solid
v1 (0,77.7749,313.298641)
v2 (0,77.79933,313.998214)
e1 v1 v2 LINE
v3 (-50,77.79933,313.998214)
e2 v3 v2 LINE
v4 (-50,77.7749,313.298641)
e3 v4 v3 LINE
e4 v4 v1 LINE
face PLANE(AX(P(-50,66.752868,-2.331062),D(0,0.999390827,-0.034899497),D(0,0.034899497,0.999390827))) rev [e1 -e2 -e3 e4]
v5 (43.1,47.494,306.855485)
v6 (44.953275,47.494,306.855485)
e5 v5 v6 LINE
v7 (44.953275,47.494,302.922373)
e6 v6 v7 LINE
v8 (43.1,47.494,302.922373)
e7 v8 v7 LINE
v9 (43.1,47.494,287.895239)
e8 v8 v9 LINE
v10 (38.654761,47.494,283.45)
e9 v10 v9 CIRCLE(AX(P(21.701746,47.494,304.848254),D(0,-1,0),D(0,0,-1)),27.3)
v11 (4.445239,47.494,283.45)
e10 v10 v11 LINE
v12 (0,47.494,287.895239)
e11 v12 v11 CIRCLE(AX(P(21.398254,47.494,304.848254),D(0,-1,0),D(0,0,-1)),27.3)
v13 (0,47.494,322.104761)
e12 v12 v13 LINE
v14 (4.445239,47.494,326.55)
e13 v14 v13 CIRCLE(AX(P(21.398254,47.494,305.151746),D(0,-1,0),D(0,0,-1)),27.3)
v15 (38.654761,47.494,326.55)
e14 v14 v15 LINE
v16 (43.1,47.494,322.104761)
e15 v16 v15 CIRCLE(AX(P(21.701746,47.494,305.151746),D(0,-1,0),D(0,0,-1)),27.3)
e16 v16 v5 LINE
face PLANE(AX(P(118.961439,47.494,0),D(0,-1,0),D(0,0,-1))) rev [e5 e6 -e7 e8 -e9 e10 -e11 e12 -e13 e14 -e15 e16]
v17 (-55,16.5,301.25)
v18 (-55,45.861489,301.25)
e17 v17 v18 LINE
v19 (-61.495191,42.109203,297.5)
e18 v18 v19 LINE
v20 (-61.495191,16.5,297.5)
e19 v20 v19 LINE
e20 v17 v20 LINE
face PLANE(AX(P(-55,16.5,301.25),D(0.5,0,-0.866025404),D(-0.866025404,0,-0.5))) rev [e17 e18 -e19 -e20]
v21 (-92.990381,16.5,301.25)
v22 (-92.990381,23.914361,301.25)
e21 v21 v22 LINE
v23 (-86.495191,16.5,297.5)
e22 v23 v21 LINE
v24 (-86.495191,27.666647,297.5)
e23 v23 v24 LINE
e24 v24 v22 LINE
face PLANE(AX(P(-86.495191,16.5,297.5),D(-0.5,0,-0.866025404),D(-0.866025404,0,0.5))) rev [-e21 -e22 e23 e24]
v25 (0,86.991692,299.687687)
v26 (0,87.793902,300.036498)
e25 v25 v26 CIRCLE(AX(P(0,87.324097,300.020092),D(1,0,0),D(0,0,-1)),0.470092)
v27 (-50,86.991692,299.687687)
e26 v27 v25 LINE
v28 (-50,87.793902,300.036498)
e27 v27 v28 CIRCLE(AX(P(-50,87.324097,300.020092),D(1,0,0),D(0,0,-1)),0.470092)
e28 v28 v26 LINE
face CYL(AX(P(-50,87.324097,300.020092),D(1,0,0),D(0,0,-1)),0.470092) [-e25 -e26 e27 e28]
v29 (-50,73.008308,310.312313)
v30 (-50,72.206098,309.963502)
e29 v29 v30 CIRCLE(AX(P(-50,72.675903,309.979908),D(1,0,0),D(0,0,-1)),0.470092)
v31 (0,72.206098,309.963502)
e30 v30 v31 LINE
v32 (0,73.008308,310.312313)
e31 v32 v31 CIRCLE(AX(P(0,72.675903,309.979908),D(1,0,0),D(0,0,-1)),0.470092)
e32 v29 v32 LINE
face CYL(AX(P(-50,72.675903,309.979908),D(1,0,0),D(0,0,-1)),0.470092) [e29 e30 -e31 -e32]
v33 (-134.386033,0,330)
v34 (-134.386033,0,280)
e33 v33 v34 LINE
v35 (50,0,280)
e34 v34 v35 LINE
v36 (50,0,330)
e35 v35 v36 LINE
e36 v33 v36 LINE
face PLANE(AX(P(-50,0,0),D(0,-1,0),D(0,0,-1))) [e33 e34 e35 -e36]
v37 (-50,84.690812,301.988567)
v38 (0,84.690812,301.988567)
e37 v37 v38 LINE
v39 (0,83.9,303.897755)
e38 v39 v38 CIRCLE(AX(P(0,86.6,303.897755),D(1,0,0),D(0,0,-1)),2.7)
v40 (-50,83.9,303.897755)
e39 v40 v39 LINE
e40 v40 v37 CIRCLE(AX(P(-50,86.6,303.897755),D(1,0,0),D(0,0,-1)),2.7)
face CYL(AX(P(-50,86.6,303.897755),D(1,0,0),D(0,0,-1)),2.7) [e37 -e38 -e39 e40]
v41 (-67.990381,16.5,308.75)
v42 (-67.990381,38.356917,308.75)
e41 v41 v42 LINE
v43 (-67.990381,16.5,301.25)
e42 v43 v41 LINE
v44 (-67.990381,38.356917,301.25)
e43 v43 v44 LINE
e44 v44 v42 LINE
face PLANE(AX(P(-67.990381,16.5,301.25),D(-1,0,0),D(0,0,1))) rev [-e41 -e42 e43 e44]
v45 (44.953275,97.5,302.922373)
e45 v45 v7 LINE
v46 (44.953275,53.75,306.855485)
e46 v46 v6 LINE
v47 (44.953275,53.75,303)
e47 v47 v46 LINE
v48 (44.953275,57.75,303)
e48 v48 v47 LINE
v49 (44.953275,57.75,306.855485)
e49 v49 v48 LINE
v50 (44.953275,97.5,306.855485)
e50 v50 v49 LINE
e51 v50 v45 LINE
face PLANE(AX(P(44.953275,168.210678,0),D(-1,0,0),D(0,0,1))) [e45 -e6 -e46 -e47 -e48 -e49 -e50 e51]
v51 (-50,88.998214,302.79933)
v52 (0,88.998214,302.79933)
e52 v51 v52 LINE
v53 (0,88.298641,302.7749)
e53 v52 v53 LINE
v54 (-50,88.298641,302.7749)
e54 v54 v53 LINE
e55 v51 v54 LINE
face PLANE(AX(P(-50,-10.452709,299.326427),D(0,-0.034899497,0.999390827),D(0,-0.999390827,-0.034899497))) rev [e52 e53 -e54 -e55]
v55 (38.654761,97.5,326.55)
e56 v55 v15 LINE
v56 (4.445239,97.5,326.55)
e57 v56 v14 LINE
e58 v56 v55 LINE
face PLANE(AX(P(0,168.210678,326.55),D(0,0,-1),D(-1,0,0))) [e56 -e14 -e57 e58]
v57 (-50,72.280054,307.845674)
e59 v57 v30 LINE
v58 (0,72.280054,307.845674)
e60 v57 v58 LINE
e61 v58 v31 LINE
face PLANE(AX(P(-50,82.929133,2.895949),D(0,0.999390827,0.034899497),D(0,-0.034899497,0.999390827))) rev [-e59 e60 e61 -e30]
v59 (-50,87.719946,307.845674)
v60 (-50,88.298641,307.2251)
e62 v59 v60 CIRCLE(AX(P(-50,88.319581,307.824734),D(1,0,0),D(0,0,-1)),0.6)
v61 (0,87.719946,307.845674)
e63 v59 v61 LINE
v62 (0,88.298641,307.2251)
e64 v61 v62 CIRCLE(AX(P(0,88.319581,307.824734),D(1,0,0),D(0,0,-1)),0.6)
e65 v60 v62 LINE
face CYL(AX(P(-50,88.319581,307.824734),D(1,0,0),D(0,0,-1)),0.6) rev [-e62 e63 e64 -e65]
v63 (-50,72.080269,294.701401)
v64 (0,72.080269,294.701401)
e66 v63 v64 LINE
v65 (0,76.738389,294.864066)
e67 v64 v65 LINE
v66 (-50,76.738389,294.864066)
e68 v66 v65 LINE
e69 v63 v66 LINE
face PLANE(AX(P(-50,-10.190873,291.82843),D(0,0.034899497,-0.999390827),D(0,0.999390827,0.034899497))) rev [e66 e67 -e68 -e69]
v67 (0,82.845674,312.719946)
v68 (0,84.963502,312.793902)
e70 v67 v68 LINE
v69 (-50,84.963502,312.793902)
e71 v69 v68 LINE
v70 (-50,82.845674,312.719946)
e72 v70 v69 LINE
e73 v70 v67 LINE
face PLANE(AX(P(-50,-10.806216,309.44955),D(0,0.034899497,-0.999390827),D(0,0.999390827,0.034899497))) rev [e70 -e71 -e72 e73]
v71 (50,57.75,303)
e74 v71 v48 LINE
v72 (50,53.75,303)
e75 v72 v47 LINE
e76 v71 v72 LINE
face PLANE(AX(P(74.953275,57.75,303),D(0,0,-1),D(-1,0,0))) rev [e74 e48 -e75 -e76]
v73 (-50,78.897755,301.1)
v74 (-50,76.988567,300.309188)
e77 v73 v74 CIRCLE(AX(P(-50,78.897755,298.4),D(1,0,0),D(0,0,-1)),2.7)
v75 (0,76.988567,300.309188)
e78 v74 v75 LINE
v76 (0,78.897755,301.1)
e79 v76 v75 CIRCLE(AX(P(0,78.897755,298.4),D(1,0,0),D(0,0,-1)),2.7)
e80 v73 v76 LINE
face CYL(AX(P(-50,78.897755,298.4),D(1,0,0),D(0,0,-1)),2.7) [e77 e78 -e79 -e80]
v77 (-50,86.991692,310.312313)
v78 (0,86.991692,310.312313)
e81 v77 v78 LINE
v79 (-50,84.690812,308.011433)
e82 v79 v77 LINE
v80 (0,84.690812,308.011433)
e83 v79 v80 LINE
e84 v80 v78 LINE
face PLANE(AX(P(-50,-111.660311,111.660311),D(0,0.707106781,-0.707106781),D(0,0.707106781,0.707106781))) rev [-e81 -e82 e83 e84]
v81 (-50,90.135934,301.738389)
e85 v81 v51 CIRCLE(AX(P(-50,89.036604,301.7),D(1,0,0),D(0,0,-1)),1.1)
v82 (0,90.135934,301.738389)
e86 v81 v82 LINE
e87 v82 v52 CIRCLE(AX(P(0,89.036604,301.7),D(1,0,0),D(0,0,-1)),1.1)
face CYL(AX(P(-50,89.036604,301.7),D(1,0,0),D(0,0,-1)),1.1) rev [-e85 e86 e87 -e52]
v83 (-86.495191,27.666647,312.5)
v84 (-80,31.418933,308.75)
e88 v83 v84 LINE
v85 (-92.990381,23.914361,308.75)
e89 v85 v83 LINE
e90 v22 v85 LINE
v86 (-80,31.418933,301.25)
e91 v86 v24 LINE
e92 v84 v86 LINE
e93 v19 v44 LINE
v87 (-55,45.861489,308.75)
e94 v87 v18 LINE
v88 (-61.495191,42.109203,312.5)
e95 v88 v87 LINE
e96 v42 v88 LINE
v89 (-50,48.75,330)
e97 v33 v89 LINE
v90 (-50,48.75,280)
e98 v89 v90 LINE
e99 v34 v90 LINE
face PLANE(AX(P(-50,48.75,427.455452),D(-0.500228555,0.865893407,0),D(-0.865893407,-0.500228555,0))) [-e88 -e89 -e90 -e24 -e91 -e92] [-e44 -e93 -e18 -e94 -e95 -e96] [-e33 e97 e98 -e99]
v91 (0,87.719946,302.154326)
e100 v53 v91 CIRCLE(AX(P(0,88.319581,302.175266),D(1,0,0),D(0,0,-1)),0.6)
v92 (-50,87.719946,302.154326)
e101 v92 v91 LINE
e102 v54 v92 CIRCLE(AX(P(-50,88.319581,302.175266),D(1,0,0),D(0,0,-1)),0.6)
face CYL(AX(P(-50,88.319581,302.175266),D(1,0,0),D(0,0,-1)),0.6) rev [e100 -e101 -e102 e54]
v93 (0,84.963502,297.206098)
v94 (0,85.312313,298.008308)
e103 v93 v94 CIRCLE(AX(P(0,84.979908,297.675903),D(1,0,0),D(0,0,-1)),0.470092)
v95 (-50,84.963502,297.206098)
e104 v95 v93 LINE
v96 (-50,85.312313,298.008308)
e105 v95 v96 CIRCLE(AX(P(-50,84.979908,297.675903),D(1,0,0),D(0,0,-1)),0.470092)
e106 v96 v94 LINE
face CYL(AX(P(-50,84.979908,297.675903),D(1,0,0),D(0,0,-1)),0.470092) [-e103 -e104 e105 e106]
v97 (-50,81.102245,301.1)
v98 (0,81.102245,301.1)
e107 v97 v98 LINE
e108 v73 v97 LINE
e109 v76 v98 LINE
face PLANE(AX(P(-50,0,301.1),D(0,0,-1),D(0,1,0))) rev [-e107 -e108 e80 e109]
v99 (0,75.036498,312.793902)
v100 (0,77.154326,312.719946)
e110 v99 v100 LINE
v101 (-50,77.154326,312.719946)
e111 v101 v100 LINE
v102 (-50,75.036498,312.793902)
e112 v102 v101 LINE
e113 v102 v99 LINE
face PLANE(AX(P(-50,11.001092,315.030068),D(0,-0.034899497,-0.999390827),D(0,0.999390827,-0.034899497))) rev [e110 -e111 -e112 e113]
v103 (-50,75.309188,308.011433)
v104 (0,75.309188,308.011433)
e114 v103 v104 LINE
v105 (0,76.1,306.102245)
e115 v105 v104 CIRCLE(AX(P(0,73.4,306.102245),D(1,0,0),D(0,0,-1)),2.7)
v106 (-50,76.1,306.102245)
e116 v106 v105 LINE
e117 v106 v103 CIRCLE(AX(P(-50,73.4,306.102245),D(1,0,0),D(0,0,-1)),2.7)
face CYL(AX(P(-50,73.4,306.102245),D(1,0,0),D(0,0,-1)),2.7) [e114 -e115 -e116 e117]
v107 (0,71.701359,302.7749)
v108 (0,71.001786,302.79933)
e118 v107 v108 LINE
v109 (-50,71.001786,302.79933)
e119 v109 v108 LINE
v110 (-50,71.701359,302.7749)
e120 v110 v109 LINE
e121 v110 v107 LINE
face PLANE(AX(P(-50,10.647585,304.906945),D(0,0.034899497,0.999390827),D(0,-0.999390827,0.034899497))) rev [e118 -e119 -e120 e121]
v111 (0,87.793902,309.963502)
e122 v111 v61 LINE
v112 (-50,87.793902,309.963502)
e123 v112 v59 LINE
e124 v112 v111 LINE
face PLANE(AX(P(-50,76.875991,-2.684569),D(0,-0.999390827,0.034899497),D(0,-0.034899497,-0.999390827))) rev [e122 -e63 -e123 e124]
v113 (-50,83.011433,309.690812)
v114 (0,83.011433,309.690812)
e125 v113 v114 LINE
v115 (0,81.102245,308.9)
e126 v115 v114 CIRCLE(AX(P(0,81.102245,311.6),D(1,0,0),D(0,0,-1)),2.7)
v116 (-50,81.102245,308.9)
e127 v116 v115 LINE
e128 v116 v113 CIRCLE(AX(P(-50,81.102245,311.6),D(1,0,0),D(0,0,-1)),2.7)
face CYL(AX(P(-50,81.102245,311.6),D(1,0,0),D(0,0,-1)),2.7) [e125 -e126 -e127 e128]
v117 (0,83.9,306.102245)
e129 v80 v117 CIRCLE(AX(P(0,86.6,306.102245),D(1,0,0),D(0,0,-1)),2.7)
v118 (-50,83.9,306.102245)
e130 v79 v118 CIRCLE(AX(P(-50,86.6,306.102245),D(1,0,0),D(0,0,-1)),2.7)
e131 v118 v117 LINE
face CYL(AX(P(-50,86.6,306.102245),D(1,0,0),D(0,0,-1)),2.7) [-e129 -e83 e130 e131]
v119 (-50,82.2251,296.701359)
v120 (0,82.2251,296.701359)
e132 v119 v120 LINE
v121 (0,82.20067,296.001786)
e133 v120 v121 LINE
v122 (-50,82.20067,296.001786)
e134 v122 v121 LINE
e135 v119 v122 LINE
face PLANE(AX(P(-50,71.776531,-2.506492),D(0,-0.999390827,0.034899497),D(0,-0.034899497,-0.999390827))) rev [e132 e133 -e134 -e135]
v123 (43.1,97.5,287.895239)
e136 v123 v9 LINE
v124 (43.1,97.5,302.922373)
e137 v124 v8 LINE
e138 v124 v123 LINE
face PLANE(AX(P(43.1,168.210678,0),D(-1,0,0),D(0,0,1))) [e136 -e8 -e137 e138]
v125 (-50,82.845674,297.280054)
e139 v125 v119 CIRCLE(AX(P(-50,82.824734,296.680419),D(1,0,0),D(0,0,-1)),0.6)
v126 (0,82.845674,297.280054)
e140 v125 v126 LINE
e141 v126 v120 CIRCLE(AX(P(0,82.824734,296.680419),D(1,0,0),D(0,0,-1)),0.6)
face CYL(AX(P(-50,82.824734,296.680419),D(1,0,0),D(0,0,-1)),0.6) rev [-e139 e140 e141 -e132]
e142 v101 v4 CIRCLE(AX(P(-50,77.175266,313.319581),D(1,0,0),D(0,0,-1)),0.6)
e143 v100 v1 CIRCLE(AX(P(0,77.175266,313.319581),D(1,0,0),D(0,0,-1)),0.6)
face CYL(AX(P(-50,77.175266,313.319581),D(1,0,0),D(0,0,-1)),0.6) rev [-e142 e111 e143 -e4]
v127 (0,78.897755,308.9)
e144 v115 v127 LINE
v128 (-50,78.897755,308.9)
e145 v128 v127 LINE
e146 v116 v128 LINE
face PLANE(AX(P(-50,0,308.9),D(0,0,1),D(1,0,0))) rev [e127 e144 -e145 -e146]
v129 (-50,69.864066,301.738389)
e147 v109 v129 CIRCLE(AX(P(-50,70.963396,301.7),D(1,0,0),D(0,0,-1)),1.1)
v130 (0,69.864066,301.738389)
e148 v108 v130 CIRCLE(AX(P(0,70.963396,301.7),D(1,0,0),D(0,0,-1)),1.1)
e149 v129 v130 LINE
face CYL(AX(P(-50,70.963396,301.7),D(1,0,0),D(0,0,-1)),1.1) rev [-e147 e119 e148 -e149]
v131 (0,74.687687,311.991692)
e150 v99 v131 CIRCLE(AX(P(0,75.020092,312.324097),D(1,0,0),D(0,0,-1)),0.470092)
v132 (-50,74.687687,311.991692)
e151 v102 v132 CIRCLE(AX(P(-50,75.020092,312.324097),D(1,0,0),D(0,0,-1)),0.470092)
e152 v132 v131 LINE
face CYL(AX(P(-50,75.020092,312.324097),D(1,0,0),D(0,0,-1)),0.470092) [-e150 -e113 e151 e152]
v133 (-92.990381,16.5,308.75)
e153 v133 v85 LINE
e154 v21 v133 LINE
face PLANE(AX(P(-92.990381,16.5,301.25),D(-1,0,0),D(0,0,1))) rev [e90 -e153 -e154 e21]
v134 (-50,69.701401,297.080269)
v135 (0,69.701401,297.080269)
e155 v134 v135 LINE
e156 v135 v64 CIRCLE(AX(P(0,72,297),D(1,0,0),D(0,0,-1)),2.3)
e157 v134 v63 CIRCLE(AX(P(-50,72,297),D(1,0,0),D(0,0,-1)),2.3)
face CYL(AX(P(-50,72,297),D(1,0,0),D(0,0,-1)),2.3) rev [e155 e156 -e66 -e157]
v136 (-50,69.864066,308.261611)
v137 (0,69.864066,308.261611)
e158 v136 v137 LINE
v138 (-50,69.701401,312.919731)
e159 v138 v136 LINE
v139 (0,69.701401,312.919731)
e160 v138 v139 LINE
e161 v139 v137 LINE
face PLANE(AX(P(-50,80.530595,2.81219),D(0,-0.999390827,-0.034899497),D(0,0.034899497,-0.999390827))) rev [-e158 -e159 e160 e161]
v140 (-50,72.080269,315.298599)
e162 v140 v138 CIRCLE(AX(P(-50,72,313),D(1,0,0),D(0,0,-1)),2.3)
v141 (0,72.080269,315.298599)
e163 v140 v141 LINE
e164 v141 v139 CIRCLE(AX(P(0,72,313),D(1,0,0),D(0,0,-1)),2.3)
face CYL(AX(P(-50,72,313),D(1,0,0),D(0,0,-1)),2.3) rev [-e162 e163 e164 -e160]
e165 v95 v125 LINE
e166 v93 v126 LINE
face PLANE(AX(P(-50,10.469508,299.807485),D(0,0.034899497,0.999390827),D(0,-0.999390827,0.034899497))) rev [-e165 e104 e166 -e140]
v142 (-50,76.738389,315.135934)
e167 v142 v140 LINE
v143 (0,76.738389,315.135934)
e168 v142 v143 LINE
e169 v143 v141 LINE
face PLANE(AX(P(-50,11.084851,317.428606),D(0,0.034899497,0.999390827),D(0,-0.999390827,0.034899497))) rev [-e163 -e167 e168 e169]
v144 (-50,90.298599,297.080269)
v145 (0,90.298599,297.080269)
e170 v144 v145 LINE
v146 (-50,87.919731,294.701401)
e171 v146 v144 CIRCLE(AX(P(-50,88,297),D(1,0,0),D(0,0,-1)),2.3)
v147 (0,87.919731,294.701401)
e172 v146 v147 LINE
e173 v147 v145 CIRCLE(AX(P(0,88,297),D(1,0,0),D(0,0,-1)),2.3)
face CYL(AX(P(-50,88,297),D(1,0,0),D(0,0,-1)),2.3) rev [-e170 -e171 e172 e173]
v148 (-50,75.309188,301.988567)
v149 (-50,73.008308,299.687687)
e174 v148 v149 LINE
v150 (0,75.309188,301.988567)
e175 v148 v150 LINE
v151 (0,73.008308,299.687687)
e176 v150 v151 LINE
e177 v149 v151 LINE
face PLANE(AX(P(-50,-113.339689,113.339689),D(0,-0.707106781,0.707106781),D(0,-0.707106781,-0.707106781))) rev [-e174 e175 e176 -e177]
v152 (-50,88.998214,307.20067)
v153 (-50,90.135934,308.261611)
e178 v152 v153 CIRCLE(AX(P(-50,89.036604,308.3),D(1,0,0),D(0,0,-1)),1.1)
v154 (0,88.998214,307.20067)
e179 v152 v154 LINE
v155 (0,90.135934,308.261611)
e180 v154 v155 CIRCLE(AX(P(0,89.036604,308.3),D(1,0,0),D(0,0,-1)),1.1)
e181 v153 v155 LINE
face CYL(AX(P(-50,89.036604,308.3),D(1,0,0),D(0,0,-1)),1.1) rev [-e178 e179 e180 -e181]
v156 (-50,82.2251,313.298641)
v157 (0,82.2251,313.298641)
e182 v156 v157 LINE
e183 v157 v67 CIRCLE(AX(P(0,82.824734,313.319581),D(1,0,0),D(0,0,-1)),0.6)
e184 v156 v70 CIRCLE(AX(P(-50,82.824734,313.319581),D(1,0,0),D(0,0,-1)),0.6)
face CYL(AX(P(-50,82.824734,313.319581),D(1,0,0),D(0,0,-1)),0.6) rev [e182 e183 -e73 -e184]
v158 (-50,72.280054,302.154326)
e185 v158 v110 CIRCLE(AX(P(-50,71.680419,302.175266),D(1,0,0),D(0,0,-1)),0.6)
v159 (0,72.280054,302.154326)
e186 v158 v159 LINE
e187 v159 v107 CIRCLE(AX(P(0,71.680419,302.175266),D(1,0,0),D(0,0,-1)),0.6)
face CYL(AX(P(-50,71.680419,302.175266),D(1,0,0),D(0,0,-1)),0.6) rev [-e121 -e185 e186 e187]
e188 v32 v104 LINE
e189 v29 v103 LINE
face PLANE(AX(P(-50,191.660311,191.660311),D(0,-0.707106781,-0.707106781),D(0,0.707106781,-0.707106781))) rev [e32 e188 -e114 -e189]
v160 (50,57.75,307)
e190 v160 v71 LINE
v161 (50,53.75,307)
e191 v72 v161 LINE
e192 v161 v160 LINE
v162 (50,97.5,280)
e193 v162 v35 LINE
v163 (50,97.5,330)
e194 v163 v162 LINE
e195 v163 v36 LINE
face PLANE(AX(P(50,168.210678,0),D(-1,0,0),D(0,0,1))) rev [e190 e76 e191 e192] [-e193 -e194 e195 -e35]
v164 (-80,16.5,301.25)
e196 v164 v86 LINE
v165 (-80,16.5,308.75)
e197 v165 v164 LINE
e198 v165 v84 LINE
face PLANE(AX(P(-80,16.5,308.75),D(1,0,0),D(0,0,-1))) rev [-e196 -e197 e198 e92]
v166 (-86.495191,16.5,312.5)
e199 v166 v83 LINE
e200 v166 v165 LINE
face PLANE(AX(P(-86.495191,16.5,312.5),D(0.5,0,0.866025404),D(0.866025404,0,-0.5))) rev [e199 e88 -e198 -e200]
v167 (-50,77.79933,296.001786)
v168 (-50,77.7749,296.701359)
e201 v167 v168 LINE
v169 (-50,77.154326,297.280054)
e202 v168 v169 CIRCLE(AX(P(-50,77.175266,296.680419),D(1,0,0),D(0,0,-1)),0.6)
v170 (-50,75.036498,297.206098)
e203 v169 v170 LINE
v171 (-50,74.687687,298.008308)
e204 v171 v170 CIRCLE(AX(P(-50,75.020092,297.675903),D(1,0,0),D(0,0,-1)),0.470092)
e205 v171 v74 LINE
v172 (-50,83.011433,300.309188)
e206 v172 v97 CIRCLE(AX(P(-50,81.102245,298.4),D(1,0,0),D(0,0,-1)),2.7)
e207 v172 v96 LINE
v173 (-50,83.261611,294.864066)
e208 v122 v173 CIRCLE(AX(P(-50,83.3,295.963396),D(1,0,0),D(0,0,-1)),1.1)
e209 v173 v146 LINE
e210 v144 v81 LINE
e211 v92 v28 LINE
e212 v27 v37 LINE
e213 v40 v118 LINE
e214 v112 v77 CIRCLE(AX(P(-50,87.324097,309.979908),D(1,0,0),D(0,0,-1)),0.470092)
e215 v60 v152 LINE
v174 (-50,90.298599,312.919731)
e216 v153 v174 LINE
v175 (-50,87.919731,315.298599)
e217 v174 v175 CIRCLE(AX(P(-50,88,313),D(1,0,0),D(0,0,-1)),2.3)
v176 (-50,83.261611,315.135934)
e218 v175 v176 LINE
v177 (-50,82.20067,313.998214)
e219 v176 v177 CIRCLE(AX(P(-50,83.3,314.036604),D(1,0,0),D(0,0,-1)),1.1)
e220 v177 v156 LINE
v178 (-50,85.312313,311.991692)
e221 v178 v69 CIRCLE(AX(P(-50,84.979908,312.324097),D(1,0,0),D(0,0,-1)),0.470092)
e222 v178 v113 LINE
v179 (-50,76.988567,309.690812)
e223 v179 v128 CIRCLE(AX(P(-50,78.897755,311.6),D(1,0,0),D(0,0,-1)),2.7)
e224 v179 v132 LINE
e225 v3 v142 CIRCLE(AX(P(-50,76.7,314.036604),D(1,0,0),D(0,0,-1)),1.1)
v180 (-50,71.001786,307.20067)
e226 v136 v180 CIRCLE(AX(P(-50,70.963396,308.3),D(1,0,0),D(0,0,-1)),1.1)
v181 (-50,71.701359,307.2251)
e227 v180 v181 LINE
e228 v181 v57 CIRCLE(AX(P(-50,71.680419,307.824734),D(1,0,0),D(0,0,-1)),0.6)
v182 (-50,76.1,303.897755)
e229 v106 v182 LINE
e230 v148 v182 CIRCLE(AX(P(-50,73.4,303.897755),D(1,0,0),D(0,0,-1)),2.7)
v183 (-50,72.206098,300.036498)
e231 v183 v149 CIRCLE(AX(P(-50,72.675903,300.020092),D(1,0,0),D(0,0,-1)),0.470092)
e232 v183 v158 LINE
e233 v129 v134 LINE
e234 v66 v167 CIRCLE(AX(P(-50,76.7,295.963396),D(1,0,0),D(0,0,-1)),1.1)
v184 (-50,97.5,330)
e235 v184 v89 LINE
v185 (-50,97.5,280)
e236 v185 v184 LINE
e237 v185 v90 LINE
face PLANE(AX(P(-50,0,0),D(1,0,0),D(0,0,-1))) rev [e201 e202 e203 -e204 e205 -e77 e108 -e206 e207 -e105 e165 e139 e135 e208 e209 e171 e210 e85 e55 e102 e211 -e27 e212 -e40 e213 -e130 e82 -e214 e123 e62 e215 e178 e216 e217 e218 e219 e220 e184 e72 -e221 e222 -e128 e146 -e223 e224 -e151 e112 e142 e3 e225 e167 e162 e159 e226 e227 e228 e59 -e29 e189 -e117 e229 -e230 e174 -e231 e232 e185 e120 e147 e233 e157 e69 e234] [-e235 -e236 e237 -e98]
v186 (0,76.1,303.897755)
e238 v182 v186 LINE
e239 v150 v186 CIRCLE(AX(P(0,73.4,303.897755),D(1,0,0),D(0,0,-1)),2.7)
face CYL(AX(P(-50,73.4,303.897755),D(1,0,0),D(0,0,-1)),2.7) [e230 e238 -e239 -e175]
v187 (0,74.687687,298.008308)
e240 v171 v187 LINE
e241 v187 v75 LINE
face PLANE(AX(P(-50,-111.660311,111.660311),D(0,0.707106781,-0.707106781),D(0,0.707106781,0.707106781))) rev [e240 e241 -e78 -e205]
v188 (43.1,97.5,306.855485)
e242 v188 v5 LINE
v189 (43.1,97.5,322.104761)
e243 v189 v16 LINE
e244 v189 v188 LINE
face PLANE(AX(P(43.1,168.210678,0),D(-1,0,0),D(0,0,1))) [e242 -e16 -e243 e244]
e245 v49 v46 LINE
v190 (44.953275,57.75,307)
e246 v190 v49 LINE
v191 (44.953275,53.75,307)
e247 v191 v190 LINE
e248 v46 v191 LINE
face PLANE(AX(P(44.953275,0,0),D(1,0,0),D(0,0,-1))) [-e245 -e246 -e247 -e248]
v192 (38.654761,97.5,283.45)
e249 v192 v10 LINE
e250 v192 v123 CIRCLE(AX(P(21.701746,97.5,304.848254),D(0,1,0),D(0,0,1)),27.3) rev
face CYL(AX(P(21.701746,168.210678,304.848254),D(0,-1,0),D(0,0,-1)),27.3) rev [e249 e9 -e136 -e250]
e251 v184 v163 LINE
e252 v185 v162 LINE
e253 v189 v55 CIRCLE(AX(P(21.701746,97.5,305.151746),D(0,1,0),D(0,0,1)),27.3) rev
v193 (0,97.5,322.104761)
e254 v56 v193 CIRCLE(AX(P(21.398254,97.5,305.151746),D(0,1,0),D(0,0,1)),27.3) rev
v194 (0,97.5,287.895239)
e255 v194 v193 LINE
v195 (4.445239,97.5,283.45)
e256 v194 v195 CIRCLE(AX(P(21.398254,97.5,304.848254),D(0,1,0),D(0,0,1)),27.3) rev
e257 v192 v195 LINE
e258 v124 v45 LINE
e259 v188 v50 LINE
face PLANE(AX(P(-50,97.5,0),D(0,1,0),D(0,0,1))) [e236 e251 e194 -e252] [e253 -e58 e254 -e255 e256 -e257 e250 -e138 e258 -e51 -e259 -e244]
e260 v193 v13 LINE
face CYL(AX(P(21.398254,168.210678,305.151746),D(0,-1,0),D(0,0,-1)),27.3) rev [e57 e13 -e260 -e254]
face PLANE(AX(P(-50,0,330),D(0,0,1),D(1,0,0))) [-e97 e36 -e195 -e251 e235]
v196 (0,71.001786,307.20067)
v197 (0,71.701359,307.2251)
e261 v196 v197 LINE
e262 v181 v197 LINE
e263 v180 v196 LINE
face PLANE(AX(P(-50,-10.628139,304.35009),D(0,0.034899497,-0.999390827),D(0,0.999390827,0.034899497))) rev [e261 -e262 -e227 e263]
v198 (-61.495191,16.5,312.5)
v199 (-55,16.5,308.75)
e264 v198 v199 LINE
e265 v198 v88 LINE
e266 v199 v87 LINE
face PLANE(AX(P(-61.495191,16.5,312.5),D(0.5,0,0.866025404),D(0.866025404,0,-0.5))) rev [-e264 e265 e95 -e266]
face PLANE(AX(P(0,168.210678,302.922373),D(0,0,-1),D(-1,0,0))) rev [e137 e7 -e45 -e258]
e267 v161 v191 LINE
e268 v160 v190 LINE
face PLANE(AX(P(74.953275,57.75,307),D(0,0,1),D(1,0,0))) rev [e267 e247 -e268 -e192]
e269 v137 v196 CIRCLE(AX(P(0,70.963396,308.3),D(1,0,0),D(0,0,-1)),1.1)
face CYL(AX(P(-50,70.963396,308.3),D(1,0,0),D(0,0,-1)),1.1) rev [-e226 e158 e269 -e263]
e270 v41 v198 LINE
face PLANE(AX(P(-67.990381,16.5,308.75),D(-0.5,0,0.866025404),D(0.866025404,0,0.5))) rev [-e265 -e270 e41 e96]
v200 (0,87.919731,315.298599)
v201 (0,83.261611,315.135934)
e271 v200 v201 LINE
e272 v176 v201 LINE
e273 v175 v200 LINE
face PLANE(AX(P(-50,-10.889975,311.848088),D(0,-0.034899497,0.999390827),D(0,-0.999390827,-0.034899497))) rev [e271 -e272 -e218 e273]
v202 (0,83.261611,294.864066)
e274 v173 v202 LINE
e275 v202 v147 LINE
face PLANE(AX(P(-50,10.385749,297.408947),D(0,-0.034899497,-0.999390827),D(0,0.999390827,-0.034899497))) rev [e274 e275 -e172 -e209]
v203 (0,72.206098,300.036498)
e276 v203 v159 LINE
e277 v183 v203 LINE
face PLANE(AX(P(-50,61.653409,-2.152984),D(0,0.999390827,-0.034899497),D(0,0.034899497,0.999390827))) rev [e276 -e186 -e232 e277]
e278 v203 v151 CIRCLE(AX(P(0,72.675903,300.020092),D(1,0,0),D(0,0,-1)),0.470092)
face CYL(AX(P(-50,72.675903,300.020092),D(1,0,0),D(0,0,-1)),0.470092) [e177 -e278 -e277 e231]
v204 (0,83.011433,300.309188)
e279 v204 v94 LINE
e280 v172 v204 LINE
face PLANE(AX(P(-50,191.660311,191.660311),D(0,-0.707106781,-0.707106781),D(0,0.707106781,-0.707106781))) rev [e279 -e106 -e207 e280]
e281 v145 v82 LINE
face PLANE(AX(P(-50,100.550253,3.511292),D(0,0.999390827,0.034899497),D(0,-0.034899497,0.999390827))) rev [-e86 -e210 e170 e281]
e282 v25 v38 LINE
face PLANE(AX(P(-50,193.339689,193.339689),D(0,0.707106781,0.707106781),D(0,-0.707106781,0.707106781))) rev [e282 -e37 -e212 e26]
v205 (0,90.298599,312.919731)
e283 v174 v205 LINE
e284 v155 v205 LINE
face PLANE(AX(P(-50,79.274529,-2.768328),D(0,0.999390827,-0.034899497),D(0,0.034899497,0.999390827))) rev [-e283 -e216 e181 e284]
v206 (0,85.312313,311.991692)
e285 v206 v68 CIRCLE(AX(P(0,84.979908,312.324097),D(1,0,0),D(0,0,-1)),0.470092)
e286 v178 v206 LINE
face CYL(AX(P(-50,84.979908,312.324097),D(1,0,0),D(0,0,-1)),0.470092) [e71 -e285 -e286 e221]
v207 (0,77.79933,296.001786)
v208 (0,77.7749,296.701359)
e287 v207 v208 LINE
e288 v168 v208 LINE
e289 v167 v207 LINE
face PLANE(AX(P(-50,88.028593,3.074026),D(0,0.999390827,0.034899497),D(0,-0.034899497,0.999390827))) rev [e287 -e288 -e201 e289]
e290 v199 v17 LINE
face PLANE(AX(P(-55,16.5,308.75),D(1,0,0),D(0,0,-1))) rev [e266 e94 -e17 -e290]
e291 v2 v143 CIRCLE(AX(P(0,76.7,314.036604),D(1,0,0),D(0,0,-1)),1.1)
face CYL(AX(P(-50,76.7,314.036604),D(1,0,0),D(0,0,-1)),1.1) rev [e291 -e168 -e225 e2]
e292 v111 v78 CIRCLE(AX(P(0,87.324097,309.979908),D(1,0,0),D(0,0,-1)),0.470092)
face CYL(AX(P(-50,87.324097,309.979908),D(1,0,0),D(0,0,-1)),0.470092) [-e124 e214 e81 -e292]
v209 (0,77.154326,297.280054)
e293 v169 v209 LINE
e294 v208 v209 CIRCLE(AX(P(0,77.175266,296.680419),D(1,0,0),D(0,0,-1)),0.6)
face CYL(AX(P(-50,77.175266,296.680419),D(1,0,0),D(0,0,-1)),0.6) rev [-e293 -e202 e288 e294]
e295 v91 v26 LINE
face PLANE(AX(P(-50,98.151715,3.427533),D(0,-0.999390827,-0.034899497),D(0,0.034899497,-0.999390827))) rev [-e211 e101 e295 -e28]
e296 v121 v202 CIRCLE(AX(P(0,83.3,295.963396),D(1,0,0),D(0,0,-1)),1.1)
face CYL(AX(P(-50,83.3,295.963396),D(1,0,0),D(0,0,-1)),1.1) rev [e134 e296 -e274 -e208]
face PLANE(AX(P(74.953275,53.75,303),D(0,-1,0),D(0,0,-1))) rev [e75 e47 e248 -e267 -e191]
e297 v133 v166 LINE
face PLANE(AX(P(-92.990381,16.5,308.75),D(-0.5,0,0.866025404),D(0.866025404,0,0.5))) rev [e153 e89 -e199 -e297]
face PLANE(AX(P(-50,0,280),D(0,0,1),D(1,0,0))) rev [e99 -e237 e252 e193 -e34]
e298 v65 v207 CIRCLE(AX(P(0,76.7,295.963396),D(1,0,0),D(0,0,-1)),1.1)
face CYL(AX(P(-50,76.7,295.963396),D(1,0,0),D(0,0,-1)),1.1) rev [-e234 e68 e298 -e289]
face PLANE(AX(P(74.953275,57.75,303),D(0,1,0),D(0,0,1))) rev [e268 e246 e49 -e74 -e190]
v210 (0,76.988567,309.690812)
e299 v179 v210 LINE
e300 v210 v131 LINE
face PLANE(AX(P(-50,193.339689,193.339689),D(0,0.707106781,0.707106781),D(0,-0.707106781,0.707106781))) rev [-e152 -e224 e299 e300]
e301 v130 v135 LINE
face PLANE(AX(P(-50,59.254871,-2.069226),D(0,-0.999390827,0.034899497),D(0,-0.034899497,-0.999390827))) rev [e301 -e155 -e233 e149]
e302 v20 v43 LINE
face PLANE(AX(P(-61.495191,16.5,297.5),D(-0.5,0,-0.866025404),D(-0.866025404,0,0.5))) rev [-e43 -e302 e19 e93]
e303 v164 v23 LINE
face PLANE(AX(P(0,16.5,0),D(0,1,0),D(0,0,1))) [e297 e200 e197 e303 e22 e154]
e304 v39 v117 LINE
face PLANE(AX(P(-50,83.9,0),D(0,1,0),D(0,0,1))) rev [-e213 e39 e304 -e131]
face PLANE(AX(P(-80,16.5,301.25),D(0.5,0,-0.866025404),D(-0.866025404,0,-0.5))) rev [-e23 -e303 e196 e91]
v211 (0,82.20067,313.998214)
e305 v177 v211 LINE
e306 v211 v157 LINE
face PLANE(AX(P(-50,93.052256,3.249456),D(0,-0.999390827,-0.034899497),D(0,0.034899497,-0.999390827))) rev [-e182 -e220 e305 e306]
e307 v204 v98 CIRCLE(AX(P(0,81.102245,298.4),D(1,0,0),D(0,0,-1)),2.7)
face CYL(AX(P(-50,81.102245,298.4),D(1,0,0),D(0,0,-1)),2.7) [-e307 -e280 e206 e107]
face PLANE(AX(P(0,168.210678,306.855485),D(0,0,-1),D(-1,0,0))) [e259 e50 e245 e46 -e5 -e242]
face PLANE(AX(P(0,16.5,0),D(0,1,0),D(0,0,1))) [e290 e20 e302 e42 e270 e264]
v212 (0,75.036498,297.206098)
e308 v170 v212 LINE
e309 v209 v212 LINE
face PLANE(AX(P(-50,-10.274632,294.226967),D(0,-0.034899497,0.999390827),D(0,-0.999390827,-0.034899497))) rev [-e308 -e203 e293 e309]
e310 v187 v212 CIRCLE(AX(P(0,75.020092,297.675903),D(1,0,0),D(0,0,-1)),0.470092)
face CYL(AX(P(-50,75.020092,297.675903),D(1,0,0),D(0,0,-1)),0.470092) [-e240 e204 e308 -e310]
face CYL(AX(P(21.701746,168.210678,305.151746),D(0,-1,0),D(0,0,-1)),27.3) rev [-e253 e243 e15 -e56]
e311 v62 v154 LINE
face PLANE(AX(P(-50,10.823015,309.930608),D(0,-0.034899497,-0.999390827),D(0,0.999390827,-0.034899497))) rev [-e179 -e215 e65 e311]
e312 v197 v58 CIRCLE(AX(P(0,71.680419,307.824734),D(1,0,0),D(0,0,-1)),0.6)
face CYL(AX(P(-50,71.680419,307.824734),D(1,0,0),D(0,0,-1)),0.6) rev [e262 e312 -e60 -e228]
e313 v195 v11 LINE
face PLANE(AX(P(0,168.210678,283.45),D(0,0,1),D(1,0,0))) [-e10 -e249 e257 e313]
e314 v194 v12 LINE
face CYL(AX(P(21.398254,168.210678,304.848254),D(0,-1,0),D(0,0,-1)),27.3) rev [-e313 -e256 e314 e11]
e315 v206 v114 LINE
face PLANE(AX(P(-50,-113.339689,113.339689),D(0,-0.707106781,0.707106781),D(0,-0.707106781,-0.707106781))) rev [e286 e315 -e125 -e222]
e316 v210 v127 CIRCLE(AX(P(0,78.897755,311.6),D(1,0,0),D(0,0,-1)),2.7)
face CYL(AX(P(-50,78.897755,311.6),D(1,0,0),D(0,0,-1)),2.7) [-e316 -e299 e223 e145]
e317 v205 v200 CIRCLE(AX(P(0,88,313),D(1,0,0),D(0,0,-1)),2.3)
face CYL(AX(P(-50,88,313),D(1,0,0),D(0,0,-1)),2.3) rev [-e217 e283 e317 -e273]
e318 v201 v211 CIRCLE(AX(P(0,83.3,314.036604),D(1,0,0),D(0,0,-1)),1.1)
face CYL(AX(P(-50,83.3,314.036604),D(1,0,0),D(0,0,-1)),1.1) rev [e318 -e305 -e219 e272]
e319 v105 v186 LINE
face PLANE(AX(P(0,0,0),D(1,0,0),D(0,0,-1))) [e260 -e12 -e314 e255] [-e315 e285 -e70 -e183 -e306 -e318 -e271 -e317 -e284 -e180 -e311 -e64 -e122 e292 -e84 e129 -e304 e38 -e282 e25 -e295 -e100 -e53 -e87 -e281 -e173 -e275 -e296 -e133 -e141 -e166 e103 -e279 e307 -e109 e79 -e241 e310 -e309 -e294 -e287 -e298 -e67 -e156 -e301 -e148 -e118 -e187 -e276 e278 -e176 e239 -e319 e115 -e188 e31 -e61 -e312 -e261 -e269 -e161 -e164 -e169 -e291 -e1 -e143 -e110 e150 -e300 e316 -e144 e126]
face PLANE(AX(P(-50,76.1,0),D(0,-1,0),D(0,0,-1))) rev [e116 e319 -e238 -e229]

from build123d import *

# Parameters (mm, degrees)
SKETCH1_W           = 35
SKETCH1_H           = 50
SKETCH1_W_2         = 62.5
BOSS_EXTRUDE1_DEPTH = 50
BOSS_EXTRUDE2_DEPTH = 50
CUT_EXTRUDE1_DEPTH  = 81
BOSS_EXTRUDE3_DEPTH = 50.006
SKETCH5_W           = 4
SKETCH5_H           = 4
CUT_EXTRUDE2_DEPTH  = 30
BOSS_EXTRUDE4_DEPTH = 50


with BuildPart() as part:
    # Sketch1 → Boss-Extrude1 (new body)
    # profile 1 of 2: a face of its own
    with BuildSketch(Plane.YZ):
        with Locations((80, 305)):
            Rectangle(SKETCH1_W, SKETCH1_H)
        with BuildLine():
            Line((76.1, 303.897755224), (76.1, 306.102244776))
            ThreePointArc((76.1, 306.102244776), (75.894474738, 307.135490044), (75.309188309, 308.011433085))
            Line((75.309188309, 308.011433085), (73.008308049, 310.312313346))
            ThreePointArc((73.008308049, 310.312313346), (72.488454457, 310.411010634), (72.206097787, 309.963502397))
            Line((72.206097787, 309.963502397), (72.280053987, 307.845673932))
            ThreePointArc((72.280053987, 307.845673932), (72.119231712, 307.415535218), (71.701359189, 307.225099738))
            Line((71.701359189, 307.225099738), (71.00178561, 307.20067009))
            ThreePointArc((71.00178561, 307.20067009), (70.213197967, 307.495510928), (69.864066254, 308.261610554))
            Line((69.864066254, 308.261610554), (69.701401098, 312.919731158))
            ThreePointArc((69.701401098, 312.919731158), (70.373654403, 314.626345597), (72.080268842, 315.298598902))
            Line((72.080268842, 315.298598902), (76.738389446, 315.135933746))
            ThreePointArc((76.738389446, 315.135933746), (77.504489072, 314.786802033), (77.79932991, 313.99821439))
            Line((77.79932991, 313.99821439), (77.774900262, 313.298640811))
            ThreePointArc((77.774900262, 313.298640811), (77.584464782, 312.880768288), (77.154326068, 312.719946013))
            Line((77.154326068, 312.719946013), (75.036497603, 312.793902213))
            ThreePointArc((75.036497603, 312.793902213), (74.588989366, 312.511545543), (74.687686654, 311.991691951))
            Line((74.687686654, 311.991691951), (76.988566915, 309.690811691))
            ThreePointArc((76.988566915, 309.690811691), (77.864509956, 309.105525262), (78.897755224, 308.9))
            Line((78.897755224, 308.9), (81.102244776, 308.9))
            ThreePointArc((81.102244776, 308.9), (82.135490044, 309.105525262), (83.011433085, 309.690811691))
            Line((83.011433085, 309.690811691), (85.312313346, 311.991691951))
            ThreePointArc((85.312313346, 311.991691951), (85.411010634, 312.511545543), (84.963502397, 312.793902213))
            Line((84.963502397, 312.793902213), (82.845673932, 312.719946013))
            ThreePointArc((82.845673932, 312.719946013), (82.415535218, 312.880768288), (82.225099738, 313.298640811))
            Line((82.225099738, 313.298640811), (82.20067009, 313.99821439))
            ThreePointArc((82.20067009, 313.99821439), (82.495510928, 314.786802033), (83.261610554, 315.135933746))
            Line((83.261610554, 315.135933746), (87.919731158, 315.298598902))
            ThreePointArc((87.919731158, 315.298598902), (89.626345597, 314.626345597), (90.298598902, 312.919731158))
            Line((90.298598902, 312.919731158), (90.135933746, 308.261610554))
            ThreePointArc((90.135933746, 308.261610554), (89.786802033, 307.495510928), (88.99821439, 307.20067009))
            Line((88.99821439, 307.20067009), (88.298640811, 307.225099738))
            ThreePointArc((88.298640811, 307.225099738), (87.880768288, 307.415535218), (87.719946013, 307.845673932))
            Line((87.719946013, 307.845673932), (87.793902213, 309.963502397))
            ThreePointArc((87.793902213, 309.963502397), (87.511545543, 310.411010634), (86.991691951, 310.312313346))
            Line((86.991691951, 310.312313346), (84.690811691, 308.011433085))
            ThreePointArc((84.690811691, 308.011433085), (84.105525262, 307.135490044), (83.9, 306.102244776))
            Line((83.9, 306.102244776), (83.9, 303.897755224))
            ThreePointArc((83.9, 303.897755224), (84.105525262, 302.864509956), (84.690811691, 301.988566915))
            Line((84.690811691, 301.988566915), (86.991691951, 299.687686654))
            ThreePointArc((86.991691951, 299.687686654), (87.511545543, 299.588989366), (87.793902213, 300.036497603))
            Line((87.793902213, 300.036497603), (87.719946013, 302.154326068))
            ThreePointArc((87.719946013, 302.154326068), (87.880768288, 302.584464782), (88.298640811, 302.774900262))
            Line((88.298640811, 302.774900262), (88.99821439, 302.79932991))
            ThreePointArc((88.99821439, 302.79932991), (89.786802033, 302.504489072), (90.135933746, 301.738389446))
            Line((90.135933746, 301.738389446), (90.298598902, 297.080268842))
            ThreePointArc((90.298598902, 297.080268842), (89.626345597, 295.373654403), (87.919731158, 294.701401098))
            Line((87.919731158, 294.701401098), (83.261610554, 294.864066254))
            ThreePointArc((83.261610554, 294.864066254), (82.495510928, 295.213197967), (82.20067009, 296.00178561))
            Line((82.20067009, 296.00178561), (82.225099738, 296.701359189))
            ThreePointArc((82.225099738, 296.701359189), (82.415535218, 297.119231712), (82.845673932, 297.280053987))
            Line((82.845673932, 297.280053987), (84.963502397, 297.206097787))
            ThreePointArc((84.963502397, 297.206097787), (85.411010634, 297.488454457), (85.312313346, 298.008308049))
            Line((85.312313346, 298.008308049), (83.011433085, 300.309188309))
            ThreePointArc((83.011433085, 300.309188309), (82.135490044, 300.894474738), (81.102244776, 301.1))
            Line((81.102244776, 301.1), (78.897755224, 301.1))
            ThreePointArc((78.897755224, 301.1), (77.864509956, 300.894474738), (76.988566915, 300.309188309))
            Line((76.988566915, 300.309188309), (74.687686654, 298.008308049))
            ThreePointArc((74.687686654, 298.008308049), (74.588989366, 297.488454457), (75.036497603, 297.206097787))
            Line((75.036497603, 297.206097787), (77.154326068, 297.280053987))
            ThreePointArc((77.154326068, 297.280053987), (77.584464782, 297.119231712), (77.774900262, 296.701359189))
            Line((77.774900262, 296.701359189), (77.79932991, 296.00178561))
            ThreePointArc((77.79932991, 296.00178561), (77.504489072, 295.213197967), (76.738389446, 294.864066254))
            Line((76.738389446, 294.864066254), (72.080268842, 294.701401098))
            ThreePointArc((72.080268842, 294.701401098), (70.373654403, 295.373654403), (69.701401098, 297.080268842))
            Line((69.701401098, 297.080268842), (69.864066254, 301.738389446))
            ThreePointArc((69.864066254, 301.738389446), (70.213197967, 302.504489072), (71.00178561, 302.79932991))
            Line((71.00178561, 302.79932991), (71.701359189, 302.774900262))
            ThreePointArc((71.701359189, 302.774900262), (72.119231712, 302.584464782), (72.280053987, 302.154326068))
            Line((72.280053987, 302.154326068), (72.206097787, 300.036497603))
            ThreePointArc((72.206097787, 300.036497603), (72.488454457, 299.588989366), (73.008308049, 299.687686654))
            Line((73.008308049, 299.687686654), (75.309188309, 301.988566915))
            ThreePointArc((75.309188309, 301.988566915), (75.894474738, 302.864509956), (76.1, 303.897755224))
        make_face(mode=Mode.SUBTRACT)
    # profile 2 of 2: a face of its own
    with BuildSketch(Plane.YZ):
        with Locations((31.25, 305)):
            Rectangle(SKETCH1_W_2, SKETCH1_H)
    extrude(amount=-BOSS_EXTRUDE1_DEPTH)

    # Sketch2 → Boss-Extrude2 (add)
    with BuildSketch(Plane(origin=(0, 0, 280), x_dir=(1, 0, 0), z_dir=(0, 0, -1))):
        Polygon((-50, -48.75), (-134.386033469, 0), (-50, 0), align=None)
    extrude(amount=-BOSS_EXTRUDE2_DEPTH)

    # Sketch3 → Cut-Extrude1 (cut)
    with BuildSketch(Plane(origin=(0, 97.5, 0), x_dir=(-1, 0, 0), z_dir=(0, 1, 0))):
        Polygon((67.990381057, 308.75), (61.495190528, 312.5), (55, 308.75), (55, 301.25), (61.495190528, 297.5), (67.990381057, 301.25), align=None)
        Polygon((92.990381057, 308.75), (86.495190528, 312.5), (80, 308.75), (80, 301.25), (86.495190528, 297.5), (92.990381057, 301.25), align=None)
    extrude(amount=-CUT_EXTRUDE1_DEPTH, mode=Mode.SUBTRACT)

    # Sketch4 → Boss-Extrude3 (add)
    with BuildSketch(Plane.XZ.offset(-47.494)):
        with BuildLine():
            Line((43.1, 322.104760785), (43.1, 306.85548466))
            Line((43.1, 306.85548466), (44.953275281, 306.85548466))
            Line((44.953275281, 306.85548466), (44.953275281, 302.922372887))
            Line((44.953275281, 302.922372887), (43.1, 302.922372887))
            Line((43.1, 302.922372887), (43.1, 287.895239215))
            ThreePointArc((43.1, 287.895239215), (41.005760925, 285.544239075), (38.654760785, 283.45))
            Line((38.654760785, 283.45), (4.445239215, 283.45))
            ThreePointArc((4.445239215, 283.45), (2.094239075, 285.544239075), (0, 287.895239215))
            Line((0, 287.895239215), (0, 280))
            Line((0, 280), (50, 280))
            Line((50, 280), (50, 330))
            Line((50, 330), (0, 330))
            Line((0, 330), (0, 322.104760785))
            ThreePointArc((0, 322.104760785), (2.094239075, 324.455760925), (4.445239215, 326.55))
            Line((4.445239215, 326.55), (38.654760785, 326.55))
            ThreePointArc((38.654760785, 326.55), (41.005760925, 324.455760925), (43.1, 322.104760785))
        make_face()
    extrude(amount=-BOSS_EXTRUDE3_DEPTH)

    # Sketch5 → Cut-Extrude2 (cut)
    with BuildSketch(Plane(origin=(44.953275281, 0, 0), x_dir=(0, -1, 0), z_dir=(-1, 0, 0))):
        with Locations((-55.75, 305)):
            Rectangle(SKETCH5_W, SKETCH5_H)
    extrude(amount=-CUT_EXTRUDE2_DEPTH, mode=Mode.SUBTRACT)

    # Sketch6 → Boss-Extrude4 (add)
    with BuildSketch(Plane.YZ):
        Polygon((0, 280), (47.494, 280), (47.494, 287.895239215), (47.494, 322.104760785), (47.494, 330), (0, 330), align=None)
    extrude(amount=BOSS_EXTRUDE4_DEPTH)


solid = part.part
